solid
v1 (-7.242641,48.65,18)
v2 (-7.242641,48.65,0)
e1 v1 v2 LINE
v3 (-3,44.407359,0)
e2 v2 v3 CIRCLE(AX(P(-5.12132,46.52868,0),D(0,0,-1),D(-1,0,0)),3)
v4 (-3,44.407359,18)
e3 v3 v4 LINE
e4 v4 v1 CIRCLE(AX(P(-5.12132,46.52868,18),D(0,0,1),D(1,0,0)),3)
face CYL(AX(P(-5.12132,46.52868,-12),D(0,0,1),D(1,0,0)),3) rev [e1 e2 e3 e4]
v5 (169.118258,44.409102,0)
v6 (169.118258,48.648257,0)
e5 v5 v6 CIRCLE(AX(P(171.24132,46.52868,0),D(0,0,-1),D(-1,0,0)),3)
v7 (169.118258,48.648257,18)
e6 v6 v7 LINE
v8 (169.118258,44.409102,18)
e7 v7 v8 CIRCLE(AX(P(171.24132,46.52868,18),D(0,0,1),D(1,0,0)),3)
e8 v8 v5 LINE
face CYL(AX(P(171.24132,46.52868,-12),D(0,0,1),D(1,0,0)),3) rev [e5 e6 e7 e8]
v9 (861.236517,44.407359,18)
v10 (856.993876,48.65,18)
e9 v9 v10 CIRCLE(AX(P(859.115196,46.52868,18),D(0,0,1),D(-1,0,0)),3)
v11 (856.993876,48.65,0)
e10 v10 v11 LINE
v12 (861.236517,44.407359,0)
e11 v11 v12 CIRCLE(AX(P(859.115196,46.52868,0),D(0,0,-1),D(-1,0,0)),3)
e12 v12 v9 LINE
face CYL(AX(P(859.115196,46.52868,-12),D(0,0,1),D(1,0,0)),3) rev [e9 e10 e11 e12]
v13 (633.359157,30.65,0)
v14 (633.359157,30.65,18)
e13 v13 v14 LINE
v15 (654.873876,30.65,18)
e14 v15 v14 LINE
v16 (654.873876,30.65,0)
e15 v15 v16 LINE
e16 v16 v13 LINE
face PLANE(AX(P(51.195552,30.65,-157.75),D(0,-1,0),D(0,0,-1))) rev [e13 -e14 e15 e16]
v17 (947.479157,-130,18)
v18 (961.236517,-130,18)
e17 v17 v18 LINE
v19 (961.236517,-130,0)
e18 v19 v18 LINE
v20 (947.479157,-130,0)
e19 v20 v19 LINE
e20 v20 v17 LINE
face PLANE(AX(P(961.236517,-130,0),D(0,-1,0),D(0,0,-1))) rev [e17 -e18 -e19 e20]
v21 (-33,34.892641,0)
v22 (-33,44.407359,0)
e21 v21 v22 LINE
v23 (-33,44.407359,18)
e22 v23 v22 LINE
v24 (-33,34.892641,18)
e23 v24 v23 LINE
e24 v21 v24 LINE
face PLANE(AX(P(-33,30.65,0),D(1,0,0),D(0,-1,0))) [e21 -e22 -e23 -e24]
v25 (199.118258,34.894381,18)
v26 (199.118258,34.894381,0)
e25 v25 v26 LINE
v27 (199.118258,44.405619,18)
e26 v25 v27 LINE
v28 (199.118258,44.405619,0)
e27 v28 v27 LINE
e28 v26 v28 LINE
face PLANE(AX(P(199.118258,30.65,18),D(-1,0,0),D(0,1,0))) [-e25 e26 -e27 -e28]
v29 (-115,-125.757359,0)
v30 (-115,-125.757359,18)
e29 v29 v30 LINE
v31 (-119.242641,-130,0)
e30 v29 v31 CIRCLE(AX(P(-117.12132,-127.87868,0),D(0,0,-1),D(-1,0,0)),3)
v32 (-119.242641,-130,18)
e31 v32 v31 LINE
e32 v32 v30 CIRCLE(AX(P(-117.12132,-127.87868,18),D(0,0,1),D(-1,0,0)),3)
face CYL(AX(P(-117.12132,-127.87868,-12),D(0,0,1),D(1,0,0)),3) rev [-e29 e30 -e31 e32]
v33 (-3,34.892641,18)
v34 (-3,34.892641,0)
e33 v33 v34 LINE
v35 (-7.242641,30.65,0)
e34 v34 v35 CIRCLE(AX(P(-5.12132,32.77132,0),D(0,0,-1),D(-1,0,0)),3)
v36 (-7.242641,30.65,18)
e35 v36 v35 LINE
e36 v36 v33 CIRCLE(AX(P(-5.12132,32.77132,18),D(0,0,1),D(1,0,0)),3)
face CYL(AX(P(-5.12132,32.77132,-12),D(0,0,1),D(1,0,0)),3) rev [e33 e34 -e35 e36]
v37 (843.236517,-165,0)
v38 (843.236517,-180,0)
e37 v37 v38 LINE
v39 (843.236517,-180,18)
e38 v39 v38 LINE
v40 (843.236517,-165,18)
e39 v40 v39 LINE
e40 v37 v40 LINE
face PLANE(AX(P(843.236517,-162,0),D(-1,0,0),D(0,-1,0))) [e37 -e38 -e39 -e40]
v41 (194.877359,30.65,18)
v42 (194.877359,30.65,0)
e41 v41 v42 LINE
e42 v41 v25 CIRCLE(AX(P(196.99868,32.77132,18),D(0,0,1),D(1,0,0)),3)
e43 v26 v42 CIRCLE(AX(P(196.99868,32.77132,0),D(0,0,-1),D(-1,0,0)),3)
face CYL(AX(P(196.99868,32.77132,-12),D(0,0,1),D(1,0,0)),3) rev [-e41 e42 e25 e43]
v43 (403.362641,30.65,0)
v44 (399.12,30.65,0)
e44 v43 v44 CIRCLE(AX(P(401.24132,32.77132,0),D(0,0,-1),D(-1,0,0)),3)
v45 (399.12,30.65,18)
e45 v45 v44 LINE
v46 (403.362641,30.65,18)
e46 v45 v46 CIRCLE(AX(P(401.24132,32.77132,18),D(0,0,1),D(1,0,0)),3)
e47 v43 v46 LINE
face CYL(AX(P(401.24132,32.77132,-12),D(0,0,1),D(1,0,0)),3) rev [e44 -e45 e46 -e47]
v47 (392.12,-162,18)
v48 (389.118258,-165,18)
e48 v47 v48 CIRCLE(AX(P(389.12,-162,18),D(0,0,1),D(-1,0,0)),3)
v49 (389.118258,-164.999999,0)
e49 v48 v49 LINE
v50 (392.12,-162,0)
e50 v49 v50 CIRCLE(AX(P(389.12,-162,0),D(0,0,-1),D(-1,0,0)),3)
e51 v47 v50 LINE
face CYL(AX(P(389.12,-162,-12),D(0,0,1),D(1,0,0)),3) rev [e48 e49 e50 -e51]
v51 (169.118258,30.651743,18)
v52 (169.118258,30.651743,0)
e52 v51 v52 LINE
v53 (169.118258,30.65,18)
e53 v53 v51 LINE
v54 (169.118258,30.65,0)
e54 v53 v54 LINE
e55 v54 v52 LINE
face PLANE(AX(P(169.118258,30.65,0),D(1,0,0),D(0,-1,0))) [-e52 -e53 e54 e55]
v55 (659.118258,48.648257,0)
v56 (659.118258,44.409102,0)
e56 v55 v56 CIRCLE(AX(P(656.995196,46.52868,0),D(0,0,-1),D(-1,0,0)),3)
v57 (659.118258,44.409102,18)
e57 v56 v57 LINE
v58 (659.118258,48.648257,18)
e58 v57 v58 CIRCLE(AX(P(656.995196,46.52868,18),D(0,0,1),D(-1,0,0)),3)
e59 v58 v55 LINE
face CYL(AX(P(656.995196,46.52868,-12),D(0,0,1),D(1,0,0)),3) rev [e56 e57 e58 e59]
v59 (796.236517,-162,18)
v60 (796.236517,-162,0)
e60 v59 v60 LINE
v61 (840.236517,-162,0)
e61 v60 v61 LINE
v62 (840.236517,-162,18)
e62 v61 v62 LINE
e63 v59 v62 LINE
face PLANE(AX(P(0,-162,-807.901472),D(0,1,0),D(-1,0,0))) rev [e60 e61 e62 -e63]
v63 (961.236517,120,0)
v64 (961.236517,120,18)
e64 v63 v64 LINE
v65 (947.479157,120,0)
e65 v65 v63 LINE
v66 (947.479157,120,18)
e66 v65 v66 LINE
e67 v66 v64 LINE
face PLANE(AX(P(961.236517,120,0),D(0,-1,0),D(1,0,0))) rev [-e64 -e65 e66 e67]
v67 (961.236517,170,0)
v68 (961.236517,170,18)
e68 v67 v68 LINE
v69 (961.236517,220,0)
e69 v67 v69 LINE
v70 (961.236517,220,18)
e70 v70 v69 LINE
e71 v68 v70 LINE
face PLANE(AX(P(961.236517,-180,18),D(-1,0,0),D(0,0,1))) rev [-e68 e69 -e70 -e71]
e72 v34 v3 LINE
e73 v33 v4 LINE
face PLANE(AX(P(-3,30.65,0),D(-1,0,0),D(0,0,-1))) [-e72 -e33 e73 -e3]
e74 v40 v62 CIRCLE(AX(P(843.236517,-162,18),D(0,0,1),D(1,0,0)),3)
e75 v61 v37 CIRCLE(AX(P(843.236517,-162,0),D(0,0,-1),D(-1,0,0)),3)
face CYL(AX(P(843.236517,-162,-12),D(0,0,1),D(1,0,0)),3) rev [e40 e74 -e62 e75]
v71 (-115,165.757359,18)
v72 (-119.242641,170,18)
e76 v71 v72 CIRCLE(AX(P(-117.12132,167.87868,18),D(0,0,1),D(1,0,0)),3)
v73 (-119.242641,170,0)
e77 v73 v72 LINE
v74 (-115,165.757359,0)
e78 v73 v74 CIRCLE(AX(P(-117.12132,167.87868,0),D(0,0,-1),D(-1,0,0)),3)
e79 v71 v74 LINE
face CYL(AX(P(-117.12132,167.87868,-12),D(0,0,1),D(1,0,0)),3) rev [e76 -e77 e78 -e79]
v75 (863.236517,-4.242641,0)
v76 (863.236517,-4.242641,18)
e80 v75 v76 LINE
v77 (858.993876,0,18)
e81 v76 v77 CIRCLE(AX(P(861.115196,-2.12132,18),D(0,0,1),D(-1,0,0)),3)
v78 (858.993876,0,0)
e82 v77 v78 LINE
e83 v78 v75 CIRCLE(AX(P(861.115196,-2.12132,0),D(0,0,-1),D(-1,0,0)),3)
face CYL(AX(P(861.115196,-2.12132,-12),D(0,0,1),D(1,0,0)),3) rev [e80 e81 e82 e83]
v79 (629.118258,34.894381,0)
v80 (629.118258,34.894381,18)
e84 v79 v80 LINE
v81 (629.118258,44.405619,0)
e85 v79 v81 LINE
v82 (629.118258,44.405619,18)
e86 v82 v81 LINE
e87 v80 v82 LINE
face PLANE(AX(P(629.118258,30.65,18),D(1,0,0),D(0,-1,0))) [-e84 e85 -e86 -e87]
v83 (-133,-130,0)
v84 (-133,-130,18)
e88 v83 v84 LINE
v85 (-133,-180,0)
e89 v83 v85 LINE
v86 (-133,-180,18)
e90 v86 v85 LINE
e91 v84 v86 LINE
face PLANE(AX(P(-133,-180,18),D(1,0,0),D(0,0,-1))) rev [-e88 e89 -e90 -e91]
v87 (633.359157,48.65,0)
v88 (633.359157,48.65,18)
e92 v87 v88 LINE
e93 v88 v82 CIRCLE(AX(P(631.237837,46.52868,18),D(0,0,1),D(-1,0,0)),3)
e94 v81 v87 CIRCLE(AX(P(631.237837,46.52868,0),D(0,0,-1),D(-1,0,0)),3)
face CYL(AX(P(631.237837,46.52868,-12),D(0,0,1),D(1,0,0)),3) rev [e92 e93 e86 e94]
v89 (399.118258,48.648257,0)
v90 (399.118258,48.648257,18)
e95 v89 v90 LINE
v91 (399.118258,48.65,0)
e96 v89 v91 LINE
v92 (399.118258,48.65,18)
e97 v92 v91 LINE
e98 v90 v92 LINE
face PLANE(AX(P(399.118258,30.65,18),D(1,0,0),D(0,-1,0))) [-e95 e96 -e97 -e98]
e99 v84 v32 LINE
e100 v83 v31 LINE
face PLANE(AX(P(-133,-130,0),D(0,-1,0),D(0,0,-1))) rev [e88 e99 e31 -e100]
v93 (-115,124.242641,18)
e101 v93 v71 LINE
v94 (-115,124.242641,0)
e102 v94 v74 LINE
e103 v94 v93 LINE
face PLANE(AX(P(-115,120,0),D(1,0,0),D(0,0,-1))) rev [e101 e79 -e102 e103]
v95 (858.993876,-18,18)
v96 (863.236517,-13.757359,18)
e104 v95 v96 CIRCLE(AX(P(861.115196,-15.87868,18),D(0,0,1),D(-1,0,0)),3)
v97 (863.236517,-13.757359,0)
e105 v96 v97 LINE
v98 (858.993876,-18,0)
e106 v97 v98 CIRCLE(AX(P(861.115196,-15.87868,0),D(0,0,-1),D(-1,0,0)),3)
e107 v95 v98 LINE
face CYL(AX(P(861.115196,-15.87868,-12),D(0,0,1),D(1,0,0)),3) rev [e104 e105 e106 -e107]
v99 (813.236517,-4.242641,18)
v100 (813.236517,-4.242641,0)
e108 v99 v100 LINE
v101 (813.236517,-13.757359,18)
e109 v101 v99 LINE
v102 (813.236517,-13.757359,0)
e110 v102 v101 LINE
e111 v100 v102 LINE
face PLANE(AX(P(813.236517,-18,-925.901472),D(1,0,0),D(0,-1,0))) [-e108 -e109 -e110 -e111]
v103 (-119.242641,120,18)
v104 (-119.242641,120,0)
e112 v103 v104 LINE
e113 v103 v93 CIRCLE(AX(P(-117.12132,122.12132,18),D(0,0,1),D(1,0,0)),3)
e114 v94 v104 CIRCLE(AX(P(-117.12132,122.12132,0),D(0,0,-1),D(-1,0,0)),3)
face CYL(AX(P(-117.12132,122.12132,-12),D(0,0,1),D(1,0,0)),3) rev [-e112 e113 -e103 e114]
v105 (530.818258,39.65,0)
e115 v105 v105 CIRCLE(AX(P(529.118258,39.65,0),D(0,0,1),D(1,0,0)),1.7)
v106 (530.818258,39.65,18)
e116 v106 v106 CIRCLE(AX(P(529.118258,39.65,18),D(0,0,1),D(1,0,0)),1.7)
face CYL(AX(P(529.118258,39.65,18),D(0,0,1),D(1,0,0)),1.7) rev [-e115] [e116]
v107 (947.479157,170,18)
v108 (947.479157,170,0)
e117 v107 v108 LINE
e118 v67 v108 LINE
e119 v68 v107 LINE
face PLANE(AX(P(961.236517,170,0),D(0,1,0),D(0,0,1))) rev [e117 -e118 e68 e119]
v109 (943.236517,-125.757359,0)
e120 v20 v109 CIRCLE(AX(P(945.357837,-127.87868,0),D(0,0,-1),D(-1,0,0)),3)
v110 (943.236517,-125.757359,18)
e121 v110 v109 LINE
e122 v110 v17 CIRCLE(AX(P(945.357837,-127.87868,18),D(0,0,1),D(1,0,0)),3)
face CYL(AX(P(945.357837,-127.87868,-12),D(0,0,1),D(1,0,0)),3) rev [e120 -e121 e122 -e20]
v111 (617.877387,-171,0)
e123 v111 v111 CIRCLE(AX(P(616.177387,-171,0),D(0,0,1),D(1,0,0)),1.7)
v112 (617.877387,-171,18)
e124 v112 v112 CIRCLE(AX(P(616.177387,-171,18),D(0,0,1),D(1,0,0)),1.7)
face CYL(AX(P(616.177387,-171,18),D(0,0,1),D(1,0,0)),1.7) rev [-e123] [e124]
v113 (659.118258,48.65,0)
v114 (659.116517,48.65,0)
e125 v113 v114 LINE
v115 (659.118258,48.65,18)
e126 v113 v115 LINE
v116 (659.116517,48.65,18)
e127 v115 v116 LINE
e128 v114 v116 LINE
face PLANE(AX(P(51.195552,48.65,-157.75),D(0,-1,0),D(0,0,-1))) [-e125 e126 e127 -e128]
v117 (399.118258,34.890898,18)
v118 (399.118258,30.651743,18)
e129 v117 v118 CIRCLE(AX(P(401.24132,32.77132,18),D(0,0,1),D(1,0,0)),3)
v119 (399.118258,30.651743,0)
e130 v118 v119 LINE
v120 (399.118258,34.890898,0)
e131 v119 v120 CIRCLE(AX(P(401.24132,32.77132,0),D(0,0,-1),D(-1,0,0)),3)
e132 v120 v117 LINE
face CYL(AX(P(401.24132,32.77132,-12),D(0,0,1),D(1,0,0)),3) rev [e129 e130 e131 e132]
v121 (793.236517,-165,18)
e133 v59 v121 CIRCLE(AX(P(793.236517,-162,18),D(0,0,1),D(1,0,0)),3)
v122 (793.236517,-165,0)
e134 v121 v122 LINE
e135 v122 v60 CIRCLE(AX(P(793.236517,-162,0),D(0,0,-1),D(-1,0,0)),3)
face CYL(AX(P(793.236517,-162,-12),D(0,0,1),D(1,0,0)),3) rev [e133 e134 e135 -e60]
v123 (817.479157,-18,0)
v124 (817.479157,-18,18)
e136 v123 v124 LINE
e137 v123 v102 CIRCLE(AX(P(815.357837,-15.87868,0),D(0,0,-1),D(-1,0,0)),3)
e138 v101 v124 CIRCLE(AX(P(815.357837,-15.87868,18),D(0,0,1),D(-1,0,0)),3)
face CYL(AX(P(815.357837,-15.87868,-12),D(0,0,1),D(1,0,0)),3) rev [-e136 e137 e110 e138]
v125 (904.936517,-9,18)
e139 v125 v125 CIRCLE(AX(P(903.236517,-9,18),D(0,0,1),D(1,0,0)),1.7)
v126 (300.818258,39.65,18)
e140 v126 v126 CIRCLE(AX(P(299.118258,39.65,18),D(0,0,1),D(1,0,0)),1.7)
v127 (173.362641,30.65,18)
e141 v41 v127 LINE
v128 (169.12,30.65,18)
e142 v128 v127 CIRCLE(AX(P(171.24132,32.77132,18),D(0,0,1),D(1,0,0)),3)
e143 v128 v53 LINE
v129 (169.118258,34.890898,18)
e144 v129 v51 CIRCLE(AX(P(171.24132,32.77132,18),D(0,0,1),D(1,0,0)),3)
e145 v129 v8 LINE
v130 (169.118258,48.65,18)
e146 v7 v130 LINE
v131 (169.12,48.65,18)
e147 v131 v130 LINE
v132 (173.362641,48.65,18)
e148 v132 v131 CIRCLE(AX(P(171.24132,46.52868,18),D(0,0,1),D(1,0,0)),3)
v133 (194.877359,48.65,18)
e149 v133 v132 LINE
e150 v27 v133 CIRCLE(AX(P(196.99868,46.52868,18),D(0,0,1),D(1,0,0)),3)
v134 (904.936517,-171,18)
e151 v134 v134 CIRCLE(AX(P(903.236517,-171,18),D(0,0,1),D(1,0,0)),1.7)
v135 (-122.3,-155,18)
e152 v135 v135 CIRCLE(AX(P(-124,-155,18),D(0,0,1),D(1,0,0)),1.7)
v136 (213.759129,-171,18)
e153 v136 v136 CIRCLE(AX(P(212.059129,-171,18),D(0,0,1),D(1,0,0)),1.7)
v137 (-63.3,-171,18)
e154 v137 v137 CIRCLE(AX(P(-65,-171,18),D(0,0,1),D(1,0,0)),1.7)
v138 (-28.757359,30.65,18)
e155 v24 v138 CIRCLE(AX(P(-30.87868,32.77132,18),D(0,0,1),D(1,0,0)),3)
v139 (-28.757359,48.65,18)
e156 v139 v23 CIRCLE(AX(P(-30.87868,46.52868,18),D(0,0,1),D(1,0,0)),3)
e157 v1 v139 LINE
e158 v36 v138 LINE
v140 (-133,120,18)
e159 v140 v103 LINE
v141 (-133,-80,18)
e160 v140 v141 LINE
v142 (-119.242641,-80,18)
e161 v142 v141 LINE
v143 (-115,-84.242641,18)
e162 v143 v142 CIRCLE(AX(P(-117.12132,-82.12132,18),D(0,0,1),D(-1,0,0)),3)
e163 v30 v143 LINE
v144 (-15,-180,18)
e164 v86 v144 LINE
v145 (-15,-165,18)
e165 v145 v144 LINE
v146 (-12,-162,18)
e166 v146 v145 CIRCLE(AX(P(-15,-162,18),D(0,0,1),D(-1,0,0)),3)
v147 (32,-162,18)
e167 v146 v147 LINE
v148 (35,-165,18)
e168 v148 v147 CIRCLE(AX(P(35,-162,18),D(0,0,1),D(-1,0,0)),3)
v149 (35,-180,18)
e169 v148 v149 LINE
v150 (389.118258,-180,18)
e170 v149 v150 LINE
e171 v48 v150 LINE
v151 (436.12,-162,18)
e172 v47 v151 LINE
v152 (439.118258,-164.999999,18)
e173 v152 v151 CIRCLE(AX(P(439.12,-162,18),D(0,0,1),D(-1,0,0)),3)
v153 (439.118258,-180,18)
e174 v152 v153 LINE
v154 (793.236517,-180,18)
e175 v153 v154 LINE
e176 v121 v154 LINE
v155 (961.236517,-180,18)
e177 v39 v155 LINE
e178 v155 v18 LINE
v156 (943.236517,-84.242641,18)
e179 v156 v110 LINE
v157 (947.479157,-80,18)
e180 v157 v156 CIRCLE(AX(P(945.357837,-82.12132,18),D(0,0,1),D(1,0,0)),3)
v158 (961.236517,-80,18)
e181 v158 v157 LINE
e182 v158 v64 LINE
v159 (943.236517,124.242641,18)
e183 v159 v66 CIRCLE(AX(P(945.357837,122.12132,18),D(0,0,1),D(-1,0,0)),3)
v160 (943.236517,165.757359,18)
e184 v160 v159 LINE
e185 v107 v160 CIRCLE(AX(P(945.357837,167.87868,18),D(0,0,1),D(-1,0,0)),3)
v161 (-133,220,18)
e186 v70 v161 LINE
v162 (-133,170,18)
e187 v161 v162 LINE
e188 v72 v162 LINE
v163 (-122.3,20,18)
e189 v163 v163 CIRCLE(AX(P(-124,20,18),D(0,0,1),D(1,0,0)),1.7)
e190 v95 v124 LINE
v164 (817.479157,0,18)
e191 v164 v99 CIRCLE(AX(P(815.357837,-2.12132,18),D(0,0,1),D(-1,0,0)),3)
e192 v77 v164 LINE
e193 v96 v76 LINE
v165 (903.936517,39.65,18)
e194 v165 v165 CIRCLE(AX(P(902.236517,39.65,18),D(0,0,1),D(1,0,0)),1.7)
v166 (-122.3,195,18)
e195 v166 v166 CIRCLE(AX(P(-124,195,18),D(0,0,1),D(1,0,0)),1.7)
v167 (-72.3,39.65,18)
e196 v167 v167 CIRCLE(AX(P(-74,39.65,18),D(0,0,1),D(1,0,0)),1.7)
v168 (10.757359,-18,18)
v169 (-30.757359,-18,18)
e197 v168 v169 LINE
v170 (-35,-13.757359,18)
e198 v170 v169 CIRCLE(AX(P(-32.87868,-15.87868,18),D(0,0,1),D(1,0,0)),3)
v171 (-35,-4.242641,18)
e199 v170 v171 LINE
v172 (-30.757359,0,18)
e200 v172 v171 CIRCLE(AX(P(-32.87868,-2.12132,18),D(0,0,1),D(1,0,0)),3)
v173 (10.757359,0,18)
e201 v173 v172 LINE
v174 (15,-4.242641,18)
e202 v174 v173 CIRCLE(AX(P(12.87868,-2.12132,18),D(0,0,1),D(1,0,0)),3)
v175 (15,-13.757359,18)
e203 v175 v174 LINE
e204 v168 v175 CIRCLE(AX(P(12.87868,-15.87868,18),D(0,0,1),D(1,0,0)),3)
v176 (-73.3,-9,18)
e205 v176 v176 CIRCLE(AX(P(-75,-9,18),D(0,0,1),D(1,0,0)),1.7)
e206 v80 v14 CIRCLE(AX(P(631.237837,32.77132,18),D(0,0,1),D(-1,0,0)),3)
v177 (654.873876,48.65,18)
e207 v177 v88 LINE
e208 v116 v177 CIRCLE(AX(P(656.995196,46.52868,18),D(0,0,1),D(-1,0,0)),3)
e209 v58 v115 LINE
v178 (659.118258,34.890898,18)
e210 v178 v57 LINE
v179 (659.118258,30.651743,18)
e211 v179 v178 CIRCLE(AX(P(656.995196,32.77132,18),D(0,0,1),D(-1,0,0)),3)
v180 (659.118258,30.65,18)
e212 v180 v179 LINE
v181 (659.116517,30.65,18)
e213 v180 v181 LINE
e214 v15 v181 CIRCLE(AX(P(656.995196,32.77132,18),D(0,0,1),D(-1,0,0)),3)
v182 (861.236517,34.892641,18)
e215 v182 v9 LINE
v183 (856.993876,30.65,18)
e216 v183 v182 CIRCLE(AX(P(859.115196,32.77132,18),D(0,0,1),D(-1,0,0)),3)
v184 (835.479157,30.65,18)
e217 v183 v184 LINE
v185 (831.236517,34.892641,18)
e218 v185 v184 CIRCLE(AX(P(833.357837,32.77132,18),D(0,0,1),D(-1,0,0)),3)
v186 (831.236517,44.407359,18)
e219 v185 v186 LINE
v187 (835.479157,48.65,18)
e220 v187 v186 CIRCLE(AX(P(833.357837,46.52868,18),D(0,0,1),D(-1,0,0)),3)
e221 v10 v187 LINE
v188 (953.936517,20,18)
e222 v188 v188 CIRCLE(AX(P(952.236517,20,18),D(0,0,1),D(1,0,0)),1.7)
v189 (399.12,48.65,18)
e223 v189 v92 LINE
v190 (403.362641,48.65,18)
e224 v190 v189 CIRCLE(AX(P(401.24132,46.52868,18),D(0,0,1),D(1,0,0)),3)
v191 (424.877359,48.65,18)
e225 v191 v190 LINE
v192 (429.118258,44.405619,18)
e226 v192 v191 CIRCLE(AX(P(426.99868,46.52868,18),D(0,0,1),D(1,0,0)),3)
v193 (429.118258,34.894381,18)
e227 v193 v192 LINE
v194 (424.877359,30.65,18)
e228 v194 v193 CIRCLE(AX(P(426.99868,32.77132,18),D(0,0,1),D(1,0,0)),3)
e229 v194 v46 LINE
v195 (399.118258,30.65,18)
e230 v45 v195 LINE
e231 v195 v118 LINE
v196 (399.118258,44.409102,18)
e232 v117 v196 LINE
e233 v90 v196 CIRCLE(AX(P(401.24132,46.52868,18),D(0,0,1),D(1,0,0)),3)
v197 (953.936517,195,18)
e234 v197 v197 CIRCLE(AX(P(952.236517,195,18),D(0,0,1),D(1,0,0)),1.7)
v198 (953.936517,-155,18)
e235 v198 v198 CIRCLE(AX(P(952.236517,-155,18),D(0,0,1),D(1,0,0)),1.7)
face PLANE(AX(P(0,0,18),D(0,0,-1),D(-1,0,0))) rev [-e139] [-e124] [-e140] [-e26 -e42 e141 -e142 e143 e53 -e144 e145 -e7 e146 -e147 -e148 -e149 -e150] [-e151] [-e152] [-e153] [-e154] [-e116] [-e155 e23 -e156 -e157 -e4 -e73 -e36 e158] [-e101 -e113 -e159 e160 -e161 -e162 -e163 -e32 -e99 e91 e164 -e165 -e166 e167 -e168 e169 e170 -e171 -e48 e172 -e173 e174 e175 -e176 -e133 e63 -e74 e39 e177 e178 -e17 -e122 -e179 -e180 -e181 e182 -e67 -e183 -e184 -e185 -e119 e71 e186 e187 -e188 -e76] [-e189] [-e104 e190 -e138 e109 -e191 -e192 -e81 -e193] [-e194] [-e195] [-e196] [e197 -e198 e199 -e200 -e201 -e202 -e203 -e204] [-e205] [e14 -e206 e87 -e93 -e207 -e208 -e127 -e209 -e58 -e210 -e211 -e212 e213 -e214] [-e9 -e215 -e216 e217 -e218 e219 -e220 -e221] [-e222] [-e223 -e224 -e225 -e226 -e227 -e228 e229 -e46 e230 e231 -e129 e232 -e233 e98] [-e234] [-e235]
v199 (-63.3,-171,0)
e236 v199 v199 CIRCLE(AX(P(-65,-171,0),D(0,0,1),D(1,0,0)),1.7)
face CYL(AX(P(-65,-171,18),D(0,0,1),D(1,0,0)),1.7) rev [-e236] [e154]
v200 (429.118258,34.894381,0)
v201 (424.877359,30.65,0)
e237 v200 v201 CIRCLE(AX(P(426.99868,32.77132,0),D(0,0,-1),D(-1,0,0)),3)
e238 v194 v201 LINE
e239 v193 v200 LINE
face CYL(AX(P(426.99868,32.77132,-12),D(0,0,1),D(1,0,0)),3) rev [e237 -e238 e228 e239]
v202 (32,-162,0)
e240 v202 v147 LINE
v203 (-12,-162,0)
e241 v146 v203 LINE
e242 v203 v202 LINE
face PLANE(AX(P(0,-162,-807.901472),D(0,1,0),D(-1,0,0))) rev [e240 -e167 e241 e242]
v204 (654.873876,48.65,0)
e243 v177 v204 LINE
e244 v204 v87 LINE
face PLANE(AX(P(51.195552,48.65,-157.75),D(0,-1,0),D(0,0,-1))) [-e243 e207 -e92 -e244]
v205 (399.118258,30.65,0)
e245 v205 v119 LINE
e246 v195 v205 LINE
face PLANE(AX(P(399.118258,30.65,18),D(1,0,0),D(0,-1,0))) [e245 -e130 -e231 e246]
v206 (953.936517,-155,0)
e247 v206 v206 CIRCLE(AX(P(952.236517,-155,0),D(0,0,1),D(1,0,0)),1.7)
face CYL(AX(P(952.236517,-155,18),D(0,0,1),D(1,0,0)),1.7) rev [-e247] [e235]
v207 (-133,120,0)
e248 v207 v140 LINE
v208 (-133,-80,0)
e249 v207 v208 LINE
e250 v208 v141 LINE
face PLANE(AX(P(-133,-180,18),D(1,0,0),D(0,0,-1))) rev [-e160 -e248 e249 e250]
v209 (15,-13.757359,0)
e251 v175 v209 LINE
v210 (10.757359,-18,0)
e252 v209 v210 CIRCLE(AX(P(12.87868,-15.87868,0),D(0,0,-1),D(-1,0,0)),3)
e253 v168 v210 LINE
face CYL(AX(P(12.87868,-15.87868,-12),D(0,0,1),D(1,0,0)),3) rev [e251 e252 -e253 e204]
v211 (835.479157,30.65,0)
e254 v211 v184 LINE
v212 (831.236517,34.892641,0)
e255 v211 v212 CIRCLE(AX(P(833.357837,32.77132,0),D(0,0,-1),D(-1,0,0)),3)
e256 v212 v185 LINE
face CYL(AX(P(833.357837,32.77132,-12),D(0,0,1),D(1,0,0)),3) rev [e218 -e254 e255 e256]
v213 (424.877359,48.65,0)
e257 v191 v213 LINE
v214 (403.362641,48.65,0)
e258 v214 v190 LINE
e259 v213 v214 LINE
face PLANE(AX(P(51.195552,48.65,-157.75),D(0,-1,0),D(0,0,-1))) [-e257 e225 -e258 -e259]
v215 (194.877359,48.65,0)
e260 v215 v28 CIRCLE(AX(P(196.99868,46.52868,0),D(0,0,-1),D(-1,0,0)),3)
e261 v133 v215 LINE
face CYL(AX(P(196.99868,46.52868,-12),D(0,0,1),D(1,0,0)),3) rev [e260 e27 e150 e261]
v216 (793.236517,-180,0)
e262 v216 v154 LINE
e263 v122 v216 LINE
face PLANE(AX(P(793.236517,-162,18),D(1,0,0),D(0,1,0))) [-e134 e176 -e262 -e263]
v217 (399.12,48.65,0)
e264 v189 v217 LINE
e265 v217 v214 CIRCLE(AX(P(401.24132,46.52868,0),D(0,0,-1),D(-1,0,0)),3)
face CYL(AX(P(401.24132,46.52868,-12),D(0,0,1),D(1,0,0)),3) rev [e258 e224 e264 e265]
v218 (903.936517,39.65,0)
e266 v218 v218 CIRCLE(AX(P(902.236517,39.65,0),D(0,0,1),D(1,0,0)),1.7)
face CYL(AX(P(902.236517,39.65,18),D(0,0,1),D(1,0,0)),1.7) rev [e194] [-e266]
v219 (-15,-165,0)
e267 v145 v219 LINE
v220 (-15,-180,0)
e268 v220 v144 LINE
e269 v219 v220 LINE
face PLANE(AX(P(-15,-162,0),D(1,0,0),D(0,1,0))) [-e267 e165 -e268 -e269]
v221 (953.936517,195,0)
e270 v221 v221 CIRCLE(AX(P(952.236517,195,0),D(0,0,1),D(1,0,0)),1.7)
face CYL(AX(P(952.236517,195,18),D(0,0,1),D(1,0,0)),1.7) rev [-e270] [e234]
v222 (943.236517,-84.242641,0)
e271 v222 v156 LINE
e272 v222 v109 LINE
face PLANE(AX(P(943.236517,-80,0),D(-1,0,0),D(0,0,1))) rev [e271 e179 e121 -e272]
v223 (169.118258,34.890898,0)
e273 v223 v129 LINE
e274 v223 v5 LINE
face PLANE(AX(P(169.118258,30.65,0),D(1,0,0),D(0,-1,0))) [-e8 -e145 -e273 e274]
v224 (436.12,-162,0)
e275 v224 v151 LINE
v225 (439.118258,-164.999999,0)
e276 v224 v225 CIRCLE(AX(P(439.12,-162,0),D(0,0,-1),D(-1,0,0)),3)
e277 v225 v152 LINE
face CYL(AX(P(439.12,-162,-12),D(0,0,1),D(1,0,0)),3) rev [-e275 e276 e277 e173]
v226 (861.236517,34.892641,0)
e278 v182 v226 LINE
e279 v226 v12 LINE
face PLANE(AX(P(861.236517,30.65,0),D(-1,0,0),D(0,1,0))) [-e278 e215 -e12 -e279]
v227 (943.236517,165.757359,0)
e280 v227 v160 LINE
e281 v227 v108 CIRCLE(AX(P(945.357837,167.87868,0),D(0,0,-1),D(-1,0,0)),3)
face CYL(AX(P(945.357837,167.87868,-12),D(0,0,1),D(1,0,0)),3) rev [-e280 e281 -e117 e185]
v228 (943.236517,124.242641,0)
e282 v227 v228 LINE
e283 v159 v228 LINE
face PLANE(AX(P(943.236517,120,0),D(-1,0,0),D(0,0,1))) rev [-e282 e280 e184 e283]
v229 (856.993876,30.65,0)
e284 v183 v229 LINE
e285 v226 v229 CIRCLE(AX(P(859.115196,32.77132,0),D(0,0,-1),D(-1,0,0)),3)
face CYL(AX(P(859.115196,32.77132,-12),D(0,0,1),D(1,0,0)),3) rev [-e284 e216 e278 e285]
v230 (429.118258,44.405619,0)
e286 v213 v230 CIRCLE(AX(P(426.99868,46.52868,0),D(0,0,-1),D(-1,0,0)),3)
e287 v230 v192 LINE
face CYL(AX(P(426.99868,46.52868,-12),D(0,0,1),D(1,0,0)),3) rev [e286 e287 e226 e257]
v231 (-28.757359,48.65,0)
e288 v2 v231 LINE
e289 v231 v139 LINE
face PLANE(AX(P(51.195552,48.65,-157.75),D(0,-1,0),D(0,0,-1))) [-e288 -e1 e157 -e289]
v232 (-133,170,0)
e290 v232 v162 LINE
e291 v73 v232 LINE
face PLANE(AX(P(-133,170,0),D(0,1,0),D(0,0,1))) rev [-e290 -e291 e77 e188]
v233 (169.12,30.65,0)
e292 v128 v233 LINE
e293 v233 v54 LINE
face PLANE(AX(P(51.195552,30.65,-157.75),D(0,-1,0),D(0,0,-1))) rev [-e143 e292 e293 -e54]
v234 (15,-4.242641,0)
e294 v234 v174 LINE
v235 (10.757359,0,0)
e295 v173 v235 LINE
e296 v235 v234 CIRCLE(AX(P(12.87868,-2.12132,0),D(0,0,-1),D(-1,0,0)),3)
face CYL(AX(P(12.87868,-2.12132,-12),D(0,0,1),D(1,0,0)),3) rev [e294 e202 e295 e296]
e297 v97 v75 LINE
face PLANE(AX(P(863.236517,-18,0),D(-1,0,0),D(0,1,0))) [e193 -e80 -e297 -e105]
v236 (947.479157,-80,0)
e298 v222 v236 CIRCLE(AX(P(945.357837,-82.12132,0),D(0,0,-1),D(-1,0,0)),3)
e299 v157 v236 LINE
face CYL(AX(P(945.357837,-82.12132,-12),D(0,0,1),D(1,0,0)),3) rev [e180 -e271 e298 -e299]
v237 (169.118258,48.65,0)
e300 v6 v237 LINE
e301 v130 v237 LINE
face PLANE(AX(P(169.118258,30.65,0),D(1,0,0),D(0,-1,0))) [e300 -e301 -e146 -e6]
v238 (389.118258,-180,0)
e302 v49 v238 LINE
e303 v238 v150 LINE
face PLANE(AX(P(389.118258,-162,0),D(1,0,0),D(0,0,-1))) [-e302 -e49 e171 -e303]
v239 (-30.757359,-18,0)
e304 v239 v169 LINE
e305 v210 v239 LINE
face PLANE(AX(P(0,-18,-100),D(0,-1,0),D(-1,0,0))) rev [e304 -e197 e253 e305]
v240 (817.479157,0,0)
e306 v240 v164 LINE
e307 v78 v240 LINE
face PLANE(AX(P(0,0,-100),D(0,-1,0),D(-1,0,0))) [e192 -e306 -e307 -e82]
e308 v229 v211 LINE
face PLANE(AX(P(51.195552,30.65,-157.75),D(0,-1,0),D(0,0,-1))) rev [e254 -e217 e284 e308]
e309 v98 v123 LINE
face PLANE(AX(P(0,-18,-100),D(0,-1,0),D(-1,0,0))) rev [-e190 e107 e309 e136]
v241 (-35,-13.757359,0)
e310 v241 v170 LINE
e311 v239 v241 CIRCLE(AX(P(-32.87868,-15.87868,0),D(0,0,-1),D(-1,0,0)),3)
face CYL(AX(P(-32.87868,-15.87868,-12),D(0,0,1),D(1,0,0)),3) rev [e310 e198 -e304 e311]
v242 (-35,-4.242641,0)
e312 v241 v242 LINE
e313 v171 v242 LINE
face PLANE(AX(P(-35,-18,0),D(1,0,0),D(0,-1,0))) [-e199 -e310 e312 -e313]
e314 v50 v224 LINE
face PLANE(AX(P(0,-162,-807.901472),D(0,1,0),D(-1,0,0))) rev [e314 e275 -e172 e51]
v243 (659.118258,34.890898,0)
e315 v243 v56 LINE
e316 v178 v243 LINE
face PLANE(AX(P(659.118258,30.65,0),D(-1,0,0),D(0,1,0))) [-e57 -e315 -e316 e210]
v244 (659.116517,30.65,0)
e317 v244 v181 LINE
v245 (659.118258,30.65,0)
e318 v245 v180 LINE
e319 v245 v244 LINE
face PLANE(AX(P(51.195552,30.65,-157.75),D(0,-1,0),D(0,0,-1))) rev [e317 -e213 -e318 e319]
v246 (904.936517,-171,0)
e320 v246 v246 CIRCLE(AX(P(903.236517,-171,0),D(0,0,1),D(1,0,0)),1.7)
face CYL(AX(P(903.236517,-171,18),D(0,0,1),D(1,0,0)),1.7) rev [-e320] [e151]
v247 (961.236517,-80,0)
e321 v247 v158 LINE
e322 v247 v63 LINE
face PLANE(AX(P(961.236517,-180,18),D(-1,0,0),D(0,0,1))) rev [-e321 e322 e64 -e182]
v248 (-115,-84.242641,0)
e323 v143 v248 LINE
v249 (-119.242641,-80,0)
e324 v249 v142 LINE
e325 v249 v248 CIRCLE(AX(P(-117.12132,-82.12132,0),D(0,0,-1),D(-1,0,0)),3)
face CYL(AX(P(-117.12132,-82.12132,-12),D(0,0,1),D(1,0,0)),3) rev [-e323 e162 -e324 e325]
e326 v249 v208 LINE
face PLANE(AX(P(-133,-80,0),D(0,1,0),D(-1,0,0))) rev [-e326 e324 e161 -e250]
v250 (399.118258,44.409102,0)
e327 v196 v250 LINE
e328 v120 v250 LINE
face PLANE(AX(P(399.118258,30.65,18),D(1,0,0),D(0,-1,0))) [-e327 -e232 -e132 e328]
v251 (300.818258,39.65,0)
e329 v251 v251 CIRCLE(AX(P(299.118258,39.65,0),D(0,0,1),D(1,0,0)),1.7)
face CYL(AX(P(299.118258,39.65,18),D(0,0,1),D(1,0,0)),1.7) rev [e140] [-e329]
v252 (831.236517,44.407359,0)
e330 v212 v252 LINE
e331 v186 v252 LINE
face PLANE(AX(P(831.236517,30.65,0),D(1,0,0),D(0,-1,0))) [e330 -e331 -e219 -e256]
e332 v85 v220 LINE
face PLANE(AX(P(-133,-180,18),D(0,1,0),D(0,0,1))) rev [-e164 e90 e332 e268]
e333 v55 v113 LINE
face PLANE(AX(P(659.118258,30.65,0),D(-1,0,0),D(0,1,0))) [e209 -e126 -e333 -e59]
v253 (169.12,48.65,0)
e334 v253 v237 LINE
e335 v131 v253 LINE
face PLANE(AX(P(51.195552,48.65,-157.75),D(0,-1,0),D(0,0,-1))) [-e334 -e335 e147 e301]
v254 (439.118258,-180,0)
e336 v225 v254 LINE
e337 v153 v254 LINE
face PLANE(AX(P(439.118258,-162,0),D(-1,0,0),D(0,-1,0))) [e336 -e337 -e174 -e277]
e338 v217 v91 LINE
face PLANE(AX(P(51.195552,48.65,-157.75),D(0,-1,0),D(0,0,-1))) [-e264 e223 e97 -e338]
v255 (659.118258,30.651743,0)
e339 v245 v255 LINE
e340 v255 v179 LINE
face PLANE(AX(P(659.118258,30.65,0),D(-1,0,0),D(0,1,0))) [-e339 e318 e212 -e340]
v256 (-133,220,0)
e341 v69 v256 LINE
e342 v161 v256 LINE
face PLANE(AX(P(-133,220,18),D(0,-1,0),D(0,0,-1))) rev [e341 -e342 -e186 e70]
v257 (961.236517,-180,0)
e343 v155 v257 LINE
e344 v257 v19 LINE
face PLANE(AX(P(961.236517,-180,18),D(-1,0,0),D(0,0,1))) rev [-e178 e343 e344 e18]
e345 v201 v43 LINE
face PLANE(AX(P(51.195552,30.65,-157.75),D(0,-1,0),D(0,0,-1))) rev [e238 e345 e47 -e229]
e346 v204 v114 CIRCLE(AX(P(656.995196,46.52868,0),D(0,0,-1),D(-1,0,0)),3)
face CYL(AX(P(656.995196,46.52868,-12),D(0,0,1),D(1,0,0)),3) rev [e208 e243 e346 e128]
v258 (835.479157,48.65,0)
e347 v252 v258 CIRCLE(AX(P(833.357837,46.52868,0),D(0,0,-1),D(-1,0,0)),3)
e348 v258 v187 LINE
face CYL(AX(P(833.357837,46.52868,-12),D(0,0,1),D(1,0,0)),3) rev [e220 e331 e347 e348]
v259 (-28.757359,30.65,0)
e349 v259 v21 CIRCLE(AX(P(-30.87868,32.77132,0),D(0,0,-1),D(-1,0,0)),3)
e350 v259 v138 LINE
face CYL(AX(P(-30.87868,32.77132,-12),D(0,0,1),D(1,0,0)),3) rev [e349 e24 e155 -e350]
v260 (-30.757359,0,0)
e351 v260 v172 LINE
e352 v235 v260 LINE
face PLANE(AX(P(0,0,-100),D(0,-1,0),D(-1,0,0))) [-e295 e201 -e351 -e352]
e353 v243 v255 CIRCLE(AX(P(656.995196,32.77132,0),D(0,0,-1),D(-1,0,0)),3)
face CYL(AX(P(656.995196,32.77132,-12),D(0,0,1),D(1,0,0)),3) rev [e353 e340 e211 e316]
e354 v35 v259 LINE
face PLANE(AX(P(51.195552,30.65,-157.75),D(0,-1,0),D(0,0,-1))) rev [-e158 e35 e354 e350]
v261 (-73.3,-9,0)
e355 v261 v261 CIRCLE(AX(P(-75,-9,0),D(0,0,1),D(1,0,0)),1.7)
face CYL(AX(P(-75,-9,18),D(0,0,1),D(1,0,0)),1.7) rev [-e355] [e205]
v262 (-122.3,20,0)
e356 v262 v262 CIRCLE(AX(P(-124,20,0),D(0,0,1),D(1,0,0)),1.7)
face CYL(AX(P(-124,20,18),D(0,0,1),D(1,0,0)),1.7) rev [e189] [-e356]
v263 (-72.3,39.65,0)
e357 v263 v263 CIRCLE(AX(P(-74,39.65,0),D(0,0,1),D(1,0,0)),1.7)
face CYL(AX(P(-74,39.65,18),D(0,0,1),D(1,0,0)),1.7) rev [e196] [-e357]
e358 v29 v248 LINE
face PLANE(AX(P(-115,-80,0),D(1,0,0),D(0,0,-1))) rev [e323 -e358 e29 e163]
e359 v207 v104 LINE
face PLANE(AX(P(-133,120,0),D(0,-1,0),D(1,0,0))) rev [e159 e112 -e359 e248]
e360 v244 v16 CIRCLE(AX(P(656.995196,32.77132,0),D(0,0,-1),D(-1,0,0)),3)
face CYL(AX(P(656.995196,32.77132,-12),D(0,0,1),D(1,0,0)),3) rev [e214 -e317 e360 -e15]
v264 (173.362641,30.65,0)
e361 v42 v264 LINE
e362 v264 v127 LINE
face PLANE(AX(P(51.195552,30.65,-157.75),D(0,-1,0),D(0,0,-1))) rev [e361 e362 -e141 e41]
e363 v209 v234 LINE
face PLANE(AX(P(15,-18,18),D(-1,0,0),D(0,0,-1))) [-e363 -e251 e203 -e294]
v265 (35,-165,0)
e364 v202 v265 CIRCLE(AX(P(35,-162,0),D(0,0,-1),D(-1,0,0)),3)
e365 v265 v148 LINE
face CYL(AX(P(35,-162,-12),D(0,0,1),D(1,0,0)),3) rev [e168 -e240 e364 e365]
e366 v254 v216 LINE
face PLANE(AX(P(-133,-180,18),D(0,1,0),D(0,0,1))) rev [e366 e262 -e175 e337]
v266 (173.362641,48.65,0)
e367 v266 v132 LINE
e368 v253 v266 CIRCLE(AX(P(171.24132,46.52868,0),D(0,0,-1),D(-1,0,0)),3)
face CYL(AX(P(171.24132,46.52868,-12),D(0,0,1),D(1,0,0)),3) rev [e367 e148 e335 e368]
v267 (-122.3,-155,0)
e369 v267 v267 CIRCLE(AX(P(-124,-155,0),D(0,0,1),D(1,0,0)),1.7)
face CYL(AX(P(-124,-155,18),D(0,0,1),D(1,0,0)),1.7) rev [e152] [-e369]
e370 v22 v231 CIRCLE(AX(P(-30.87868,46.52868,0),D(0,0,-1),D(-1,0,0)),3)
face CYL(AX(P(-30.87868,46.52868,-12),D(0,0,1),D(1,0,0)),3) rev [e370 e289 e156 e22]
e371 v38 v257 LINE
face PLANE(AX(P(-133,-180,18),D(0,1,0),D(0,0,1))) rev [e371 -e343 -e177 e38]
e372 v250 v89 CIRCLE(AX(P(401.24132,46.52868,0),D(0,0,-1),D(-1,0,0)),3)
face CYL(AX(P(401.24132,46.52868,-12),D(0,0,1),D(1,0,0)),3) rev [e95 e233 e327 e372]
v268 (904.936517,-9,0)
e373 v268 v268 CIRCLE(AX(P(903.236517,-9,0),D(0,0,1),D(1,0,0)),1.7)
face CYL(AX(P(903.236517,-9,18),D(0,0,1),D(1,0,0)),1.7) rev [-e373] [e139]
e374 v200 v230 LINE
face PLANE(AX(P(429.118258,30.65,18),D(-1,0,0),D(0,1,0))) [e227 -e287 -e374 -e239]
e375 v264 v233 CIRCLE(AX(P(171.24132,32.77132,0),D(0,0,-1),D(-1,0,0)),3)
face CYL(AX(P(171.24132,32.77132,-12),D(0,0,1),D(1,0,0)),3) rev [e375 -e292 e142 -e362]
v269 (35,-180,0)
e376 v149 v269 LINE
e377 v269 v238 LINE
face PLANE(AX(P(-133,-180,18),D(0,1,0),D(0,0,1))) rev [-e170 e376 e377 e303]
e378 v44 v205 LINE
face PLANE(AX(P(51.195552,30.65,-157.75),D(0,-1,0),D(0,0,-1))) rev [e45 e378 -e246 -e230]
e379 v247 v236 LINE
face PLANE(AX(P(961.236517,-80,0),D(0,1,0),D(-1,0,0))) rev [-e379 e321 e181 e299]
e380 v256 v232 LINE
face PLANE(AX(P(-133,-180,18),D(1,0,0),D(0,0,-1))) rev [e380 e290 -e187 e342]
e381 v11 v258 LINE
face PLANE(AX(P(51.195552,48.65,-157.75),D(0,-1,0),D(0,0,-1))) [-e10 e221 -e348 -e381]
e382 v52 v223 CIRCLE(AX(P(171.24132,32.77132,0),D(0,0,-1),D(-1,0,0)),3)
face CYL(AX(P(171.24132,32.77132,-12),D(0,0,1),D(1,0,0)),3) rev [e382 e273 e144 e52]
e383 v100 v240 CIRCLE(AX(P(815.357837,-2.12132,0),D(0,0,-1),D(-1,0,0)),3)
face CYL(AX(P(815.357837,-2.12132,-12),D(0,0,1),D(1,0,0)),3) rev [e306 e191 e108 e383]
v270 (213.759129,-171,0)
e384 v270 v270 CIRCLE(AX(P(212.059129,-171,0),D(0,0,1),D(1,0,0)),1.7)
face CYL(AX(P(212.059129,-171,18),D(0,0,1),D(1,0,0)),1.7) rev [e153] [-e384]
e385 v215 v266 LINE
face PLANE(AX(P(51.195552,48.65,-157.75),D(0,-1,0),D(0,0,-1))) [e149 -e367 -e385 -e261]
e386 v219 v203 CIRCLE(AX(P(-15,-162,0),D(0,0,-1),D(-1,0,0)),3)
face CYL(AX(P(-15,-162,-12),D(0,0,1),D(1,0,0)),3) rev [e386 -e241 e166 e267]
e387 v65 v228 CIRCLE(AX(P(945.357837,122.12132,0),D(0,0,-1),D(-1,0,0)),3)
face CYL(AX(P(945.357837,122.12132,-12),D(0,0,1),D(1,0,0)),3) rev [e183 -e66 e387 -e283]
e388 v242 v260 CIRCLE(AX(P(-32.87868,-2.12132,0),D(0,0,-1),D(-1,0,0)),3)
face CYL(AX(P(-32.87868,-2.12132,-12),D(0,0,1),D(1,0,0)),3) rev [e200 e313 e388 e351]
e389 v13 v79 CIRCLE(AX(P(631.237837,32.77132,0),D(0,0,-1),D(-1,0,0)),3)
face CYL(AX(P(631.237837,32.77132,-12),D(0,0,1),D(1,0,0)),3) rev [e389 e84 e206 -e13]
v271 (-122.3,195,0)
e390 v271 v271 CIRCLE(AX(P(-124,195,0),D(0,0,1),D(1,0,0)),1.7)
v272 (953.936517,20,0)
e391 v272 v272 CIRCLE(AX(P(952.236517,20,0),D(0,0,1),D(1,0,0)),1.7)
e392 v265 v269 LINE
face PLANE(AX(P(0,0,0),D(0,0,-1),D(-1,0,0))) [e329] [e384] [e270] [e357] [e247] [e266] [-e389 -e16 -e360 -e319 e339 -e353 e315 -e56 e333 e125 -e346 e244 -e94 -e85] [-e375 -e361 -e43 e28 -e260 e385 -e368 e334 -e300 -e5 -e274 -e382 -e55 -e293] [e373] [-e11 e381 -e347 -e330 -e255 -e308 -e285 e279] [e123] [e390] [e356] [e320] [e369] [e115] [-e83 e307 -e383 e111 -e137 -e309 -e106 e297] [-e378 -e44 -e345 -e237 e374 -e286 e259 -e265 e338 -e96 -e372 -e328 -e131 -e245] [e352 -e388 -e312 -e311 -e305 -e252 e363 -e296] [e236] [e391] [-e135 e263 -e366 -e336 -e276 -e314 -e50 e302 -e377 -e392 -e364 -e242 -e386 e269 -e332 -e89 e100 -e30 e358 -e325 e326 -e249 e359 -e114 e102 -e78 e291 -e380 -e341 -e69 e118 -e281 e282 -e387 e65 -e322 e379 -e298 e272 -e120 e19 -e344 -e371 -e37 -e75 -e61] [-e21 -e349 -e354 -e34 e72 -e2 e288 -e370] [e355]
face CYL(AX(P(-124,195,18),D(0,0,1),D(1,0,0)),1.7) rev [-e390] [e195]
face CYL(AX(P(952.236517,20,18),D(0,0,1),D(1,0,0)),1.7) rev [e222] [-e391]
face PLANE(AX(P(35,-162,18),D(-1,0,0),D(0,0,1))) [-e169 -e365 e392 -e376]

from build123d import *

# Parameters (mm, degrees)
SKETCH1_W            = 1094.236516538
SKETCH1_H            = 400
BOSS_EXTRUDE1_DEPTH  = 18
CAVITY1_START        = -33
CAVITY1_OUTLINE_W    = 18
CAVITY1_OUTLINE_H    = 18
CAVITY1_DEPTH        = 30
CAVITY1_START_2      = 399.118258269
CAVITY1_2_OUTLINE_W  = 18
CAVITY1_2_OUTLINE_H  = 18
CAVITY1_2_DEPTH      = 30
CAVITY1_START_3      = 813.236516538
CAVITY1_3_OUTLINE_W  = 18
CAVITY1_3_OUTLINE_H  = 18
CAVITY1_3_DEPTH      = 30
CAVITY1_START_4      = -15
CAVITY1_4_OUTLINE_W  = 18
CAVITY1_4_OUTLINE_H  = 18
CAVITY1_4_DEPTH      = 50
CAVITY1_START_5      = 831.236516538
CAVITY1_5_OUTLINE_W  = 18
CAVITY1_5_OUTLINE_H  = 18
CAVITY1_5_DEPTH      = 30
CAVITY1_START_6      = 169.118258269
CAVITY1_6_OUTLINE_W  = 18
CAVITY1_6_OUTLINE_H  = 18
CAVITY1_6_DEPTH      = 30
CAVITY1_START_7      = 629.118258269
CAVITY1_7_OUTLINE_W  = 18
CAVITY1_7_OUTLINE_H  = 18
CAVITY1_7_DEPTH      = 30
CAVITY1_START_8      = -35
CAVITY1_8_OUTLINE_W  = 18
CAVITY1_8_OUTLINE_H  = 18
CAVITY1_8_DEPTH      = 50
CAVITY1_START_9      = 389.118258269
CAVITY1_9_OUTLINE_W  = 18
CAVITY1_9_OUTLINE_H  = 18
CAVITY1_9_DEPTH      = 50
CAVITY1_START_10     = 793.236516538
CAVITY1_10_OUTLINE_W = 18
CAVITY1_10_OUTLINE_H = 18
CAVITY1_10_DEPTH     = 20
CAVITY1_START_11     = 861.236516538
CAVITY1_11_OUTLINE_W = 18
CAVITY1_11_OUTLINE_H = 18
CAVITY1_11_DEPTH     = 2
SKETCH2_W            = 18
SKETCH2_H            = 50
CUT_EXTRUDE1_DEPTH   = 18
M3_CLEARANCE_HOLE1_D = 3.4
SKETCH5_R            = 3
CUT_EXTRUDE2_DEPTH   = 30


# Read off the part's stored shape, not the designer's step: Cavity1
with BuildPart() as part:
    # Sketch1 → Boss-Extrude1 (new body)
    with BuildSketch(Plane.XY):
        with Locations((414.118258269, 20)):
            Rectangle(SKETCH1_W, SKETCH1_H)
    extrude(amount=BOSS_EXTRUDE1_DEPTH)

    # Cavity1 outline → Cavity1 (cut)
    with BuildSketch(Plane.YZ.offset(CAVITY1_START)):
        with Locations((-9, 9)):
            Rectangle(CAVITY1_OUTLINE_W, CAVITY1_OUTLINE_H)
        with Locations((39.65, 9)):
            Rectangle(CAVITY1_OUTLINE_W, CAVITY1_OUTLINE_H)
    extrude(amount=CAVITY1_DEPTH, mode=Mode.SUBTRACT)

    # Cavity1 2 outline → Cavity1 2 (cut)
    with BuildSketch(Plane.YZ.offset(CAVITY1_START_2)):
        with Locations((-171, 9)):
            Rectangle(CAVITY1_2_OUTLINE_W, CAVITY1_2_OUTLINE_H)
        with Locations((39.65, 9)):
            Rectangle(CAVITY1_2_OUTLINE_W, CAVITY1_2_OUTLINE_H)
    extrude(amount=CAVITY1_2_DEPTH, mode=Mode.SUBTRACT)

    # Cavity1 3 outline → Cavity1 3 (cut)
    with BuildSketch(Plane.YZ.offset(CAVITY1_START_3)):
        with Locations((-9, 9)):
            Rectangle(CAVITY1_3_OUTLINE_W, CAVITY1_3_OUTLINE_H)
        with Locations((-171, 9)):
            Rectangle(CAVITY1_3_OUTLINE_W, CAVITY1_3_OUTLINE_H)
    extrude(amount=CAVITY1_3_DEPTH, mode=Mode.SUBTRACT)

    # Cavity1 4 outline → Cavity1 4 (cut)
    with BuildSketch(Plane.YZ.offset(CAVITY1_START_4)):
        with Locations((-171, 9)):
            Rectangle(CAVITY1_4_OUTLINE_W, CAVITY1_4_OUTLINE_H)
    extrude(amount=CAVITY1_4_DEPTH, mode=Mode.SUBTRACT)

    # Cavity1 5 outline → Cavity1 5 (cut)
    with BuildSketch(Plane.YZ.offset(CAVITY1_START_5)):
        with Locations((-9, 9)):
            Rectangle(CAVITY1_5_OUTLINE_W, CAVITY1_5_OUTLINE_H)
        with Locations((39.65, 9)):
            Rectangle(CAVITY1_5_OUTLINE_W, CAVITY1_5_OUTLINE_H)
    extrude(amount=CAVITY1_5_DEPTH, mode=Mode.SUBTRACT)

    # Cavity1 6 outline → Cavity1 6 (cut)
    with BuildSketch(Plane.YZ.offset(CAVITY1_START_6)):
        with Locations((39.65, 9)):
            Rectangle(CAVITY1_6_OUTLINE_W, CAVITY1_6_OUTLINE_H)
    extrude(amount=CAVITY1_6_DEPTH, mode=Mode.SUBTRACT)

    # Cavity1 7 outline → Cavity1 7 (cut)
    with BuildSketch(Plane.YZ.offset(CAVITY1_START_7)):
        with Locations((39.65, 9)):
            Rectangle(CAVITY1_7_OUTLINE_W, CAVITY1_7_OUTLINE_H)
    extrude(amount=CAVITY1_7_DEPTH, mode=Mode.SUBTRACT)

    # Cavity1 8 outline → Cavity1 8 (cut)
    with BuildSketch(Plane.YZ.offset(CAVITY1_START_8)):
        with Locations((-9, 9)):
            Rectangle(CAVITY1_8_OUTLINE_W, CAVITY1_8_OUTLINE_H)
    extrude(amount=CAVITY1_8_DEPTH, mode=Mode.SUBTRACT)

    # Cavity1 9 outline → Cavity1 9 (cut)
    with BuildSketch(Plane.YZ.offset(CAVITY1_START_9)):
        with Locations((-171, 9)):
            Rectangle(CAVITY1_9_OUTLINE_W, CAVITY1_9_OUTLINE_H)
    extrude(amount=CAVITY1_9_DEPTH, mode=Mode.SUBTRACT)

    # Cavity1 10 outline → Cavity1 10 (cut)
    with BuildSketch(Plane.YZ.offset(CAVITY1_START_10)):
        with Locations((-171, 9)):
            Rectangle(CAVITY1_10_OUTLINE_W, CAVITY1_10_OUTLINE_H)
    extrude(amount=CAVITY1_10_DEPTH, mode=Mode.SUBTRACT)

    # Cavity1 11 outline → Cavity1 11 (cut)
    with BuildSketch(Plane.YZ.offset(CAVITY1_START_11)):
        with Locations((-9, 9)):
            Rectangle(CAVITY1_11_OUTLINE_W, CAVITY1_11_OUTLINE_H)
    extrude(amount=CAVITY1_11_DEPTH, mode=Mode.SUBTRACT)

    # Sketch2 → Cut-Extrude1 (cut)
    with BuildSketch(Plane.XY.offset(18)):
        with Locations((952.236516538, 145)):
            Rectangle(SKETCH2_W, SKETCH2_H)
        with Locations((952.236516538, -105)):
            Rectangle(SKETCH2_W, SKETCH2_H)
        with Locations((-124, -105)):
            Rectangle(SKETCH2_W, SKETCH2_H)
        with Locations((-124, 145)):
            Rectangle(SKETCH2_W, SKETCH2_H)
    extrude(amount=-CUT_EXTRUDE1_DEPTH, mode=Mode.SUBTRACT)

    # M3 Clearance Hole1 (through all)
    with Locations(Plane.XY.offset(18)):
        with Locations((-65, -171), (212.059129134, -171), (616.177387403, -171), (903.236516538, -171), (952.236516538, -155), (903.236516538, -9), (952.236516538, 20), (902.236516538, 39.65), (952.236516538, 195), (-124, 195), (-124, 20), (-124, -155), (-75, -9), (-74, 39.65), (299.118258269, 39.65), (529.118258269, 39.65)):
            Hole(M3_CLEARANCE_HOLE1_D / 2)

    # Sketch5 → Cut-Extrude2 (cut)
    with BuildSketch(Plane.XY.offset(18)):
        with Locations((-117.121320344, 167.878679656)):
            Circle(SKETCH5_R)
        with Locations((-117.121320344, 122.121320344)):
            Circle(SKETCH5_R)
        with Locations((-30.878679656, 46.528679656)):
            Circle(SKETCH5_R)
        with Locations((-30.878679656, 32.771320344)):
            Circle(SKETCH5_R)
        with Locations((-5.121320344, 32.771320344)):
            Circle(SKETCH5_R)
        with Locations((-5.121320344, 46.528679656)):
            Circle(SKETCH5_R)
        with Locations((-32.878679656, -2.121320344)):
            Circle(SKETCH5_R)
        with Locations((-32.878679656, -15.878679656)):
            Circle(SKETCH5_R)
        with Locations((12.878679656, -15.878679656)):
            Circle(SKETCH5_R)
        with Locations((12.878679656, -2.121320344)):
            Circle(SKETCH5_R)
        with Locations((-117.121320344, -82.121320344)):
            Circle(SKETCH5_R)
        with Locations((-117.121320344, -127.878679656)):
            Circle(SKETCH5_R)
        with Locations((945.357836881, -127.878679656)):
            Circle(SKETCH5_R)
        with Locations((945.357836881, -82.121320344)):
            Circle(SKETCH5_R)
        with Locations((945.357836881, 122.121320344)):
            Circle(SKETCH5_R)
        with Locations((945.357836881, 167.878679656)):
            Circle(SKETCH5_R)
        with Locations((815.357836881, -2.121320344)):
            Circle(SKETCH5_R)
        with Locations((815.357836881, -15.878679656)):
            Circle(SKETCH5_R)
        with Locations((861.115196194, -15.878679656)):
            Circle(SKETCH5_R)
        with Locations((861.115196194, -2.121320344)):
            Circle(SKETCH5_R)
        with Locations((171.241320344, 46.528679656)):
            Circle(SKETCH5_R)
        with Locations((171.241320344, 32.771320344)):
            Circle(SKETCH5_R)
        with Locations((196.998679656, 32.771320344)):
            Circle(SKETCH5_R)
        with Locations((196.998679656, 46.528679656)):
            Circle(SKETCH5_R)
        with Locations((631.237836881, 46.528679656)):
            Circle(SKETCH5_R)
        with Locations((631.237836881, 32.771320344)):
            Circle(SKETCH5_R)
        with Locations((656.995196194, 32.771320344)):
            Circle(SKETCH5_R)
        with Locations((656.995196194, 46.528679656)):
            Circle(SKETCH5_R)
        with Locations((833.357836881, 46.528679656)):
            Circle(SKETCH5_R)
        with Locations((833.357836881, 32.771320344)):
            Circle(SKETCH5_R)
        with Locations((859.115196194, 32.771320344)):
            Circle(SKETCH5_R)
        with Locations((859.115196194, 46.528679656)):
            Circle(SKETCH5_R)
        with Locations((401.241320344, 46.528679656)):
            Circle(SKETCH5_R)
        with Locations((401.241320344, 32.771320344)):
            Circle(SKETCH5_R)
        with Locations((426.998679656, 32.771320344)):
            Circle(SKETCH5_R)
        with Locations((426.998679656, 46.528679656)):
            Circle(SKETCH5_R)
        with Locations((-15, -162)):
            Circle(SKETCH5_R)
        with Locations((35, -162)):
            Circle(SKETCH5_R)
        with Locations((793.236516538, -162)):
            Circle(SKETCH5_R)
        with Locations((843.236516538, -162)):
            Circle(SKETCH5_R)
        with Locations((389.12, -162)):
            Circle(SKETCH5_R)
        with Locations((439.12, -162)):
            Circle(SKETCH5_R)
    extrude(amount=-CUT_EXTRUDE2_DEPTH, mode=Mode.SUBTRACT)


solid = part.part
